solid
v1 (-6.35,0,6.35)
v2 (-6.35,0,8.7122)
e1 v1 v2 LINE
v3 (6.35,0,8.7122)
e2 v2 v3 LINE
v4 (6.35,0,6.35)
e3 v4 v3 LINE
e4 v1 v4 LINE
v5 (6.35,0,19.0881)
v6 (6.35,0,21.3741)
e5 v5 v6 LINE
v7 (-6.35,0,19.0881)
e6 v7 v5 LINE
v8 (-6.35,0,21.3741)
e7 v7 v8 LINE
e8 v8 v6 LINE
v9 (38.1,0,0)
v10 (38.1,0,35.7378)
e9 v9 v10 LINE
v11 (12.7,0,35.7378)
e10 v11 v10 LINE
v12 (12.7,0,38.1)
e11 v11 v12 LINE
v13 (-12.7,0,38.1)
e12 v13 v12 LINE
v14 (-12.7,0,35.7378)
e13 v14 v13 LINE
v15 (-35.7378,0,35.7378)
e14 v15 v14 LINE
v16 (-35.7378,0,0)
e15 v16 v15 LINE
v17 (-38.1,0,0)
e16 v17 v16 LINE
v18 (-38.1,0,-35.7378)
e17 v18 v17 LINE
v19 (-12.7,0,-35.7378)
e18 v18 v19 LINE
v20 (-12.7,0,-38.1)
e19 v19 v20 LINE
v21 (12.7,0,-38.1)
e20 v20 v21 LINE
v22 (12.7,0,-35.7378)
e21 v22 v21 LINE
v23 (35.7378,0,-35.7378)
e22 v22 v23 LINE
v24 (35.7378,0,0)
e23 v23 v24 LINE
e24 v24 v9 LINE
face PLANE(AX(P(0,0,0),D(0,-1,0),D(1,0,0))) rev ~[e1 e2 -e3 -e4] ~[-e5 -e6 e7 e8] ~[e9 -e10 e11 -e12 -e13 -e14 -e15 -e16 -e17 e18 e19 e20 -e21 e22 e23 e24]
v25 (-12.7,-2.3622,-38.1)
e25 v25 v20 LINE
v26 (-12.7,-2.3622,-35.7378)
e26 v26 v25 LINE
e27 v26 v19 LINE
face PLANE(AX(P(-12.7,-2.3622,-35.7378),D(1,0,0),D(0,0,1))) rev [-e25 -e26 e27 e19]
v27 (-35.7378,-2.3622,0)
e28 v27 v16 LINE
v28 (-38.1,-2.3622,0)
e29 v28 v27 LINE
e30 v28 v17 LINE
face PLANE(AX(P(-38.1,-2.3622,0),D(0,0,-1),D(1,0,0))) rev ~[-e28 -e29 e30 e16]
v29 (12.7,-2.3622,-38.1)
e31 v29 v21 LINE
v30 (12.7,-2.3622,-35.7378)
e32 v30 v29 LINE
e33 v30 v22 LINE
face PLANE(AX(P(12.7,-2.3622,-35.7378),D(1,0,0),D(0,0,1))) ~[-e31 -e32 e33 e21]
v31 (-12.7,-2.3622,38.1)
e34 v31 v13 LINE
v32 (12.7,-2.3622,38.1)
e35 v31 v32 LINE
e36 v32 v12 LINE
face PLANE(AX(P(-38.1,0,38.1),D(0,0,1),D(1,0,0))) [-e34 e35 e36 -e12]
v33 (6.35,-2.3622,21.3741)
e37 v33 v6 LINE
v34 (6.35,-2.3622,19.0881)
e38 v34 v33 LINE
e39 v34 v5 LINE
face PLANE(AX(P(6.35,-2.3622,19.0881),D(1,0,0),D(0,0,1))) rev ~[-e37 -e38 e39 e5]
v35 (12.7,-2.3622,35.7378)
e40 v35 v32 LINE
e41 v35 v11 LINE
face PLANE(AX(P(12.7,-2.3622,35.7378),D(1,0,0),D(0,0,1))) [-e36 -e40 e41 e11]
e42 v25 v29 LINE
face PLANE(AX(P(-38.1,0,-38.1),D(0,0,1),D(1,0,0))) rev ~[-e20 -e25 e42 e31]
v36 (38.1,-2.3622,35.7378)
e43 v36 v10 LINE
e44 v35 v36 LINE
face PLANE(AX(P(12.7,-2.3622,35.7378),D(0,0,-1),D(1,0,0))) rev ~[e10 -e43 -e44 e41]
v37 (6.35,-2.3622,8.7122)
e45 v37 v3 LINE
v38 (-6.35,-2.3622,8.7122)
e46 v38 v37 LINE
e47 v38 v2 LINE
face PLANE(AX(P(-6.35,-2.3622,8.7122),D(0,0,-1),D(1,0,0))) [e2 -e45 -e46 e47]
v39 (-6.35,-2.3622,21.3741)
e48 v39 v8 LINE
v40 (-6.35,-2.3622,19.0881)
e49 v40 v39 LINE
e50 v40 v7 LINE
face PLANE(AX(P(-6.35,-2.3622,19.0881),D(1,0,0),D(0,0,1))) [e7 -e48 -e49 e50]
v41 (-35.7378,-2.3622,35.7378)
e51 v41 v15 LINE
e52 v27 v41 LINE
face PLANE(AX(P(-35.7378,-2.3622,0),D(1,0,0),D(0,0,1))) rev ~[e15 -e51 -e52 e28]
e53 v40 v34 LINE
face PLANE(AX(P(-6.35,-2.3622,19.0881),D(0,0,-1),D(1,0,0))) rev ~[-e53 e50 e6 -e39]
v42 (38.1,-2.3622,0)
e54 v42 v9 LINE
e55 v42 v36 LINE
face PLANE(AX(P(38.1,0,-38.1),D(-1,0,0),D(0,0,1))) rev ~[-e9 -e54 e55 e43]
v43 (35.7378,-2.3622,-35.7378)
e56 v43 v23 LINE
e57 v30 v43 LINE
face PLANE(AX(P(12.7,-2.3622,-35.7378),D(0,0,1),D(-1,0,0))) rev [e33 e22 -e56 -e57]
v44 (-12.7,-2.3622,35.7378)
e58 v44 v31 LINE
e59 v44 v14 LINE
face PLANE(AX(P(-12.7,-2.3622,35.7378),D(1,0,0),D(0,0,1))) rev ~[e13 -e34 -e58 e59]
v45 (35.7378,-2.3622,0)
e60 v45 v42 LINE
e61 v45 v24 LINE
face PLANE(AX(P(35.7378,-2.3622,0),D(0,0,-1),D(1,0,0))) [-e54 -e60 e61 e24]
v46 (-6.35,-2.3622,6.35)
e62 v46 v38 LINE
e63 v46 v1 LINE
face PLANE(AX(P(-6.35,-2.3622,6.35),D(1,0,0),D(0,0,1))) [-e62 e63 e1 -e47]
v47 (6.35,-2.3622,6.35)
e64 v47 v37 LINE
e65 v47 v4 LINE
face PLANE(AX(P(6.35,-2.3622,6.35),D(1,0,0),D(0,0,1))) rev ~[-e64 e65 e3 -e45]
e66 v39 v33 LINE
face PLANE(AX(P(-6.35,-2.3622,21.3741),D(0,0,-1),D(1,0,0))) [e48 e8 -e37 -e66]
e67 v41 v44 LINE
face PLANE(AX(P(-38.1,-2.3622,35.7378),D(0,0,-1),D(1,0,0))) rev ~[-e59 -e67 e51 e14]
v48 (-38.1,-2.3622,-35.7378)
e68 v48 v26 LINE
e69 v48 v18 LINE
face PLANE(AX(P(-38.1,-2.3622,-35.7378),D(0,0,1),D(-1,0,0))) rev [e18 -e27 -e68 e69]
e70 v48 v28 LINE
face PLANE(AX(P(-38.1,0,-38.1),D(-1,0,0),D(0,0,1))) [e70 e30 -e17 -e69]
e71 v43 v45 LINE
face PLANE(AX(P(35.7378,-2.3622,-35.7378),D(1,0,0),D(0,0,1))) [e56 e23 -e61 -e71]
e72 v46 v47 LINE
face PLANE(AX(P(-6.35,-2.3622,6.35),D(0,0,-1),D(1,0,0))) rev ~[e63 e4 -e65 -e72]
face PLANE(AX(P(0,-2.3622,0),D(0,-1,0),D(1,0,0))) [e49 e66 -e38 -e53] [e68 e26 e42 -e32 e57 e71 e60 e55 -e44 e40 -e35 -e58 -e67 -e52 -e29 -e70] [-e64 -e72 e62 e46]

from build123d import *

# Parameters (mm, degrees)
F0_W     = 76.2
F0_H     = 76.2
F1_DEPTH = 2.3622
F2_W     = 25.4
F2_H     = 2.3622
F3_DEPTH = 2.3632
F4_W     = 2.3622
F4_H     = 35.7378
F5_DEPTH = 25.4
F6_W     = 12.7
F6_H     = 2.286
F6_H_2   = 2.3622
F7_DEPTH = 25.4


# Not quite as in the source:
# - a pattern or mirror of a feature is missing from the dataset's text; its kind, count and spacing are read off the source's solid


with BuildPart() as f1:
    # F0 (on Front) → F1 (new body)
    with BuildSketch(Plane.XZ):
        Rectangle(F0_W, F0_H)
    extrude(amount=F1_DEPTH)

    # F2 (on face) → F3 (cut, through all)
    with BuildSketch(Plane.XZ.offset(2.3622)):
        with Locations((-25.4, 36.9189)):
            Rectangle(F2_W, F2_H)
        with Locations((25.4, 36.9189)):
            Rectangle(F2_W, F2_H)
    f3 = extrude(amount=-F3_DEPTH, mode=Mode.SUBTRACT)

    # F3_copies: F3 across plane
    add(f3.mirror(Plane(origin=(0, 0, 0), x_dir=(-1, 0, 0), z_dir=(0, 0, -1))), mode=Mode.SUBTRACT)

    # F4 (on face) → F5 (cut)
    with BuildSketch(Plane.XZ.offset(2.3622)):
        with Locations((-36.9189, 17.8689)):
            Rectangle(F4_W, F4_H)
        with Locations((36.9189, -17.8689)):
            Rectangle(F4_W, F4_H)
    extrude(amount=-F5_DEPTH, mode=Mode.SUBTRACT)

    # F6 (on face) → F7 (cut)
    with BuildSketch(Plane.XZ.offset(2.3622)):
        with Locations((0, 20.2311)):
            Rectangle(F6_W, F6_H)
        with Locations((0, 7.5311)):
            Rectangle(F6_W, F6_H_2)
    extrude(amount=-F7_DEPTH, mode=Mode.SUBTRACT)


solid = f1.part
